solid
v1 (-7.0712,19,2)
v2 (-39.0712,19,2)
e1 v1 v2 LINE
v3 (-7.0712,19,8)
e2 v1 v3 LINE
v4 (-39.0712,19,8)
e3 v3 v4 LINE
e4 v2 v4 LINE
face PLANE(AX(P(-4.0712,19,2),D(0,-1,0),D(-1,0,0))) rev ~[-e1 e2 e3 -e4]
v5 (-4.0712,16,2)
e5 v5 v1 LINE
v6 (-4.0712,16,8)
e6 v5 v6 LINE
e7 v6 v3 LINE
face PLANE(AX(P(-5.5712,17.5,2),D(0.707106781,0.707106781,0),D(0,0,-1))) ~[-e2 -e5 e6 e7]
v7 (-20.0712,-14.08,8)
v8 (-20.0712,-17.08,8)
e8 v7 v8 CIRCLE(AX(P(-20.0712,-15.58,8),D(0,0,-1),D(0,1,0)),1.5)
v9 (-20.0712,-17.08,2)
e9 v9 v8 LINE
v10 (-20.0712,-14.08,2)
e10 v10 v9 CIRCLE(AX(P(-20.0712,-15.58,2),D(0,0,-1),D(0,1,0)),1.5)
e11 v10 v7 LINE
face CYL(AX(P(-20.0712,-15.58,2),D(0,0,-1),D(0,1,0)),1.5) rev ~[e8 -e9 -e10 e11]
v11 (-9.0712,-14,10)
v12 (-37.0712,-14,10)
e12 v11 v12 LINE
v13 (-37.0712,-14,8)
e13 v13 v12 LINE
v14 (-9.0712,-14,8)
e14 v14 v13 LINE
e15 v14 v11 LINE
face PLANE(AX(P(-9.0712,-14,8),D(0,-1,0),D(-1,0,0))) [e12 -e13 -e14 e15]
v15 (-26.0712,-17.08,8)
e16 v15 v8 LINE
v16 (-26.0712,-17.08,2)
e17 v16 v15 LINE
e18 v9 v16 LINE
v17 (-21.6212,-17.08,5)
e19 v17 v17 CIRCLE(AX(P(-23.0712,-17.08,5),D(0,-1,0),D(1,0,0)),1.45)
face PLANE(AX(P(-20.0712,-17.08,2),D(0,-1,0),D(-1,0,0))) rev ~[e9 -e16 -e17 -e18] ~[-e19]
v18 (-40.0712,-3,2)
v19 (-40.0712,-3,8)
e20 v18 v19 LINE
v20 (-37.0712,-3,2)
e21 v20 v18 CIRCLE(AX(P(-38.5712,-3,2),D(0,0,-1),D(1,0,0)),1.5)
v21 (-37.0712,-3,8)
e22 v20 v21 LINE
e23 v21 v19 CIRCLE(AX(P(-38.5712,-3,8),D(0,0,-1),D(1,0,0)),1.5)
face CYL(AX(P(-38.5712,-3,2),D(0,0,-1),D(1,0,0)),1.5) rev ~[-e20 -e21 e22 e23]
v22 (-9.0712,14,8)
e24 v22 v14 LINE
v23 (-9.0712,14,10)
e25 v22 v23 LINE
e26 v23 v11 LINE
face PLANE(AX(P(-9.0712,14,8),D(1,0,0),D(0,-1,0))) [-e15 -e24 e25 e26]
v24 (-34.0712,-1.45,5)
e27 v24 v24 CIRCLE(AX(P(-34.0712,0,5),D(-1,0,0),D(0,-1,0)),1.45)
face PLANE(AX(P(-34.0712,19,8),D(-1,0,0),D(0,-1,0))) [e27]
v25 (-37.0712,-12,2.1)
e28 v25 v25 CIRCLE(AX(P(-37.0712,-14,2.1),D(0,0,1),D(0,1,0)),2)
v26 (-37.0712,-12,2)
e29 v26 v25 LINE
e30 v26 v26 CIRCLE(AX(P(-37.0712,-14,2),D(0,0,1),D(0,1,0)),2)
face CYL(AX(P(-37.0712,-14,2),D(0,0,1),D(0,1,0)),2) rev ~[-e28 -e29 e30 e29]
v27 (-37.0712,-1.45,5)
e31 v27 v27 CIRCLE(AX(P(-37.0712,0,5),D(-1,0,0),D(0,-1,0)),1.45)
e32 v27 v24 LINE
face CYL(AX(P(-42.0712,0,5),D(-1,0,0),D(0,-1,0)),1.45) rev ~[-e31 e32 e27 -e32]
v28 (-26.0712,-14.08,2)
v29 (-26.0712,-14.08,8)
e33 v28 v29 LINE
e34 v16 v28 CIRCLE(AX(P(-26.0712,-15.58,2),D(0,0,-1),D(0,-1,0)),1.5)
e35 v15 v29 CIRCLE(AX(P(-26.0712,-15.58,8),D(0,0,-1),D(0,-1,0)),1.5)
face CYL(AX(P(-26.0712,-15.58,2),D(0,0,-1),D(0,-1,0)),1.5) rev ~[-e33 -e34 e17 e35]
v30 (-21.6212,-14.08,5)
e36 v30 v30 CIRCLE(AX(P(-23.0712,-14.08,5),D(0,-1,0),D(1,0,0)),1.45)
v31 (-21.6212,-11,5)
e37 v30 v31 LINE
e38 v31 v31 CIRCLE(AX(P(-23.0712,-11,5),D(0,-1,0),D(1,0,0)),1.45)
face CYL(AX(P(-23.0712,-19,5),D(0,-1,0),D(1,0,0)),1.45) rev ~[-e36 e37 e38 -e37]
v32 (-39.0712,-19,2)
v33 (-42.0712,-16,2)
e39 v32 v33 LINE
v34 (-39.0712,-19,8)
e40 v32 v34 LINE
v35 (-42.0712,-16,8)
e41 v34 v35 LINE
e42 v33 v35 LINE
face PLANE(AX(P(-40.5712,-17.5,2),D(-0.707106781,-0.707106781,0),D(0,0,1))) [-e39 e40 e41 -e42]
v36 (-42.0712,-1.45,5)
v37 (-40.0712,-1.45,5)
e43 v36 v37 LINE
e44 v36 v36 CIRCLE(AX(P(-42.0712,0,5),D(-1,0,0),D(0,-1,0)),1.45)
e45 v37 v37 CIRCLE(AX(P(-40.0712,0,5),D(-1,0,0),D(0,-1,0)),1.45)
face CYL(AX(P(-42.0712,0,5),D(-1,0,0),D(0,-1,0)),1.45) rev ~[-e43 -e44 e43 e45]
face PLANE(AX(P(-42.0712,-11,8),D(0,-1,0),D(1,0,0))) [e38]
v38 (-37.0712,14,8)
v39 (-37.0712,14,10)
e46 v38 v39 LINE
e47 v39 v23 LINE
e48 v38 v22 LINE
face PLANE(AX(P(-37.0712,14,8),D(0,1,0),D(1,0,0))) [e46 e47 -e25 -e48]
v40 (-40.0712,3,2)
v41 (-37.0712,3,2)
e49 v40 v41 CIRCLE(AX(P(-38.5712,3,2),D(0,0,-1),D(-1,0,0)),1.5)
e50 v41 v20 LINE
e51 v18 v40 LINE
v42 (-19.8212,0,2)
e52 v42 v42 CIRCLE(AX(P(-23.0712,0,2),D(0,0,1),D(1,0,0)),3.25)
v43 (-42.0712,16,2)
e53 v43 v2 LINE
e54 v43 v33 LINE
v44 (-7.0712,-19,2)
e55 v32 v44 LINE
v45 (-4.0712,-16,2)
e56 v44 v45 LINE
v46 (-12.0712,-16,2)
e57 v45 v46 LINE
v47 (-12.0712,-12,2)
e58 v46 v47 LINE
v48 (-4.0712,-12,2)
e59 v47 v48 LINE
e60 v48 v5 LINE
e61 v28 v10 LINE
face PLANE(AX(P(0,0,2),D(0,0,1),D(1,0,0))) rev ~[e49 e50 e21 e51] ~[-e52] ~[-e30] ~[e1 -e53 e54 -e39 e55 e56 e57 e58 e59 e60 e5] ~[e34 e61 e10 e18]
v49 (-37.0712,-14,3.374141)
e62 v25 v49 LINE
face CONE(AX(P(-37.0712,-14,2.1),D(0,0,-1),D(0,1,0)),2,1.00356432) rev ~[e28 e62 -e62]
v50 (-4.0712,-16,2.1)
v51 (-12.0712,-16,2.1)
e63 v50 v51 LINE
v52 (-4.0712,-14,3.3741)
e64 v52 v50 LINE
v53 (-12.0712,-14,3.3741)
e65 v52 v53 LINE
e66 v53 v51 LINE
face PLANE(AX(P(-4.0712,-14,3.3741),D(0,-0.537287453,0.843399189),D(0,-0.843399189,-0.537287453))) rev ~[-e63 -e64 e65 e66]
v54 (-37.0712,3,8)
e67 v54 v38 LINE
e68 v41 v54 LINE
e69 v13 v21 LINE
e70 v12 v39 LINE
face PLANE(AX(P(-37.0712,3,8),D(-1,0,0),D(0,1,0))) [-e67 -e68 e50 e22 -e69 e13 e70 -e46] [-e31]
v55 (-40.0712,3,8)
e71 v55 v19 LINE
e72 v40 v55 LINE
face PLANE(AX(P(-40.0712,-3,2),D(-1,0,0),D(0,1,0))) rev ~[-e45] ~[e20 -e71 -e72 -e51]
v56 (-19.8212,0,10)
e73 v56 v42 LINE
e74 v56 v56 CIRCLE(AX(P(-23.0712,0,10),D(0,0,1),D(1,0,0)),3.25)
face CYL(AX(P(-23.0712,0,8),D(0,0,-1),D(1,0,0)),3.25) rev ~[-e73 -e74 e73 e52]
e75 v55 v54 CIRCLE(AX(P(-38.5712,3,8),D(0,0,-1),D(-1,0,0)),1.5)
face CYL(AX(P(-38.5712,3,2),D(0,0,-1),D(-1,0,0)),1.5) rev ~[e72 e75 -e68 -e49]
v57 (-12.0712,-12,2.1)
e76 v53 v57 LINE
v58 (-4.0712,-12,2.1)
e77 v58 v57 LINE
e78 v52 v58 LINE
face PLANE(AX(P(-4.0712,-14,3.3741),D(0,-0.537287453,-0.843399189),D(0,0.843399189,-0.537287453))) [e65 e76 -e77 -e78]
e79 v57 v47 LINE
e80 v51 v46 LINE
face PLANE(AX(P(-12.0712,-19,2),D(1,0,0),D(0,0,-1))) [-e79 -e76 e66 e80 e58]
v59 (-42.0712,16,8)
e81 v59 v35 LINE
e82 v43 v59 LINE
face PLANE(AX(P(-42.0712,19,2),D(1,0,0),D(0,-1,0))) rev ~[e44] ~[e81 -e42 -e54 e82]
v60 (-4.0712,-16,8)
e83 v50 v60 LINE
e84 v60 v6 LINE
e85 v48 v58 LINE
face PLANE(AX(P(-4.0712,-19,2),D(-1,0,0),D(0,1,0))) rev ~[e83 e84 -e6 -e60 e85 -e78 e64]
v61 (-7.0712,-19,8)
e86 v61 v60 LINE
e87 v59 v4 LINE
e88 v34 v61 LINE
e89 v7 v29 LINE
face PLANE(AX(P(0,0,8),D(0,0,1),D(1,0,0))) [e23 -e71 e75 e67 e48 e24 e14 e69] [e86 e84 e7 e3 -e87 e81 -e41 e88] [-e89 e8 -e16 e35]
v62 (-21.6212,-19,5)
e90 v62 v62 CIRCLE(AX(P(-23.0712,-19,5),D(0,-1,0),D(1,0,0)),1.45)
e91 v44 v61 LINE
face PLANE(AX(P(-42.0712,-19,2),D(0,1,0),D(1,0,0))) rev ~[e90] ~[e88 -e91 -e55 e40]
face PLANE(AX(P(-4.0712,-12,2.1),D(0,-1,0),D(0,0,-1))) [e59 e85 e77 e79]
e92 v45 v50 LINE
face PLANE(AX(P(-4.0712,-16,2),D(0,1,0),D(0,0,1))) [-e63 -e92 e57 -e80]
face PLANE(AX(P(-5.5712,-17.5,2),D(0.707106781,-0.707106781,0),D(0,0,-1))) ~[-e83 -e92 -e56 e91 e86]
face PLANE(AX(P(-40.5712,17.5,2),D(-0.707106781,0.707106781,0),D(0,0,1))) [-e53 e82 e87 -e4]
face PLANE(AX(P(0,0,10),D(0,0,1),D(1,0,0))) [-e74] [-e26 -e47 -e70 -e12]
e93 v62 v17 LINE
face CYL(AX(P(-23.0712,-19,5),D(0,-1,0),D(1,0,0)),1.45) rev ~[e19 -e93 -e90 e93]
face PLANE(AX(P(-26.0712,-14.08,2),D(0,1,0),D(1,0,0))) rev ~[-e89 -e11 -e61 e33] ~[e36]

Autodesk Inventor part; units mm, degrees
ref_plane "YZ Plane" through (0, 0, 0) normal (1, 0, 0) x (0, 1, 0)
ref_plane "XZ Plane" through (0, 0, 0) normal (0, 1, 0) x (-1, 0, 0)
ref_plane "XY Plane" through (0, 0, 0) normal (0, 0, 1) x (1, 0, 0)
ref_plane "Work Plane1" through (0, 0, 2) normal (0, 0, 1) x (1, 0, 0)
sketch "Sketch1" plane through (0, 0, 2) normal (0, 0, 1) x (1, 0, 0)
  circle A0 centre (-37.0712, 14) radius 3.25 construction
  circle A1 centre (-9.0712, -14) radius 3.25 construction
  line L0 (-26.0712, -17.08) -> (-20.0712, -17.08) construction
  arc A2 (-20.0712, -17.08) -> (-20.0712, -14.08) centre (-20.0712, -15.58) ccw construction
  line L1 (-20.0712, -14.08) -> (-26.0712, -14.08) construction
  line L2 (-37.0712, -3) -> (-37.0712, 3) construction
  arc A3 (-37.0712, 3) -> (-40.0712, 3) centre (-38.5712, 3) ccw construction
  line L3 (-40.0712, 3) -> (-40.0712, -3) construction
  line L4 (-47.9712, -17) -> (-47.9712, 17) construction
  line L5 (-47.9712, 17) -> (-44.3964, 17) construction
  line L6 (-44.3964, 17) -> (-40.0712, 21.3252) construction
  line L7 (-40.0712, 21.3252) -> (-40.0712, 24.9) construction
  line L8 (-40.0712, 24.9) -> (-6.0712, 24.9) construction
  line L9 (-6.0712, 24.9) -> (-6.0712, 21.3252) construction
  line L10 (-6.0712, 21.3252) -> (-1.746, 17) construction
  line L11 (-1.746, 17) -> (1.8288, 17) construction
  line L12 (1.8288, 17) -> (1.8288, -17) construction
  line L13 (1.8288, -17) -> (-1.746, -17) construction
  line L14 (-1.746, -17) -> (-6.1126, -21.3666) construction
  line L15 (-6.1126, -21.3666) -> (-6.1126, -24.9) construction
  line L16 (-6.1126, -24.9) -> (-40.0712, -24.9) construction
  circle A4 centre (-37.0712, -14) radius 3.25 construction
  circle A5 centre (-23.0712, 0) radius 12.45 construction
  circle A6 centre (-23.0712, 0) radius 12.7 construction
  line L17 (-37.0712, 14) -> (-9.0712, 14) construction
  line L18 (-9.0712, 14) -> (-9.0712, -14) construction
  line L19 (-9.0712, -14) -> (-37.0712, -14) construction
  line L20 (-37.0712, -14) -> (-37.0712, 14) construction
  line L21 (-4.0712, -19) -> (-4.0712, 19)
  line L22 (-4.0712, 19) -> (-42.0712, 19)
  line L23 (-42.0712, 19) -> (-42.0712, -19)
  line L24 (-42.0712, -19) -> (-4.0712, -19)
  circle A7 centre (-23.0712, 0) radius 12.8
  circle A8 centre (-23.0712, 0) radius 3.25 projected
  line L25 (-40.0712, -24.9) -> (-40.0712, -21.3252) projected
  line L26 (-40.0712, -21.3252) -> (-44.3964, -17) projected
  line L27 (-44.3964, -17) -> (-47.9712, -17) projected
  arc A9 (-26.0712, -14.08) -> (-26.0712, -17.08) centre (-26.0712, -15.58) ccw projected
  arc A10 (-40.0712, -3) -> (-37.0712, -3) centre (-38.5712, -3) ccw projected
  circle A11 centre (-37.0712, -14) radius 3.25 projected
  point P0 (0, 0)
  point P1 (-21.8762, -3.0223)
  point P2 (-25.9925, 1.4242)
  dimension "d0" = 5
  dimension "d1" = 0.1
extrude "Extrusion1" add sketch "Sketch1" along normal blind 6 contours L24 L23 L22 L21 | A7 | A11
sketch "Sketch2" plane through (0, 0, 2) normal (0, 0, -1) x (-1, 0, 0)
  circle A0 centre (23.0712, 0) radius 12.8 projected
  circle A1 centre (23.0712, 0) radius 8.5824
  point P0 (0, 0)
extrude "Extrusion2" add sketch "Sketch2" against normal blind 0.5
sketch "Sketch3" plane through (0, 0, 2) normal (0, 0, -1) x (-1, 0, 0)
  circle A0 centre (9.0712, -14) radius 1.45 construction
  circle A1 centre (9.0712, -14) radius 2.45
  circle A2 centre (37.0712, -14) radius 1.45 projected
  circle A3 centre (37.0712, -14) radius 1.95
  point P0 (0, 0)
  dimension "d8" = 1
  dimension "d10" = 0.5
sketch "Sketch5" plane through (0, 0, 2) normal (0, 0, -1) x (-1, 0, 0)
  arc A0 (20.0712, -14.08) -> (20.0712, -17.08) centre (20.0712, -15.58) ccw projected
  arc A1 (26.0712, -17.08) -> (26.0712, -14.08) centre (26.0712, -15.58) ccw projected
  line L0 (37.0712, 3) -> (37.0712, -3) projected
  arc A2 (37.0712, -3) -> (40.0712, -3) centre (38.5712, -3) ccw projected
  line L1 (40.0712, -3) -> (40.0712, 3) projected
  arc A3 (40.0712, 3) -> (37.0712, 3) centre (38.5712, 3) ccw projected
  line L2 (26.0712, -14.08) -> (20.0712, -14.08) projected
  arc A4 (20.0712, -14.08) -> (20.0712, -17.08) centre (20.0712, -15.58) ccw projected
  line L3 (20.0712, -17.08) -> (26.0712, -17.08) projected
  arc A5 (26.0712, -17.08) -> (26.0712, -14.08) centre (26.0712, -15.58) ccw projected
  circle A6 centre (37.0712, -14) radius 1.45 projected
  circle A7 centre (23.0712, 0) radius 1.45 projected
  circle A8 centre (9.0712, -14) radius 1.45 projected
  circle A9 centre (37.0712, 14) radius 1.45 projected
  line L4 (-1.8288, -17) -> (-1.8288, 17) projected
  line L5 (-1.8288, 17) -> (1.746, 17) projected
  line L6 (1.746, 17) -> (6.0712, 21.3252) projected
  line L7 (6.0712, 21.3252) -> (6.0712, 24.9) projected
  line L8 (6.0712, 24.9) -> (40.0712, 24.9) projected
  line L9 (40.0712, 24.9) -> (40.0712, 21.3252) projected
  line L10 (40.0712, 21.3252) -> (44.3964, 17) projected
  line L11 (44.3964, 17) -> (47.9712, 17) projected
  line L12 (47.9712, 17) -> (47.9712, -17) projected
  line L13 (44.3964, -17) -> (47.9712, -17) projected
  line L14 (40.0712, -21.3252) -> (44.3964, -17) projected
  line L15 (40.0712, -24.9) -> (40.0712, -21.3252) projected
  line L16 (6.1126, -24.9) -> (40.0712, -24.9) projected
  line L17 (6.1126, -24.9) -> (6.1126, -21.3666) projected
  line L18 (6.1126, -21.3666) -> (1.746, -17) projected
  line L19 (1.746, -17) -> (-1.8288, -17) projected
  point P0 (0, 0)
  point P1 (40.0712, -3)
extrude "Extrusion5" cut sketch "Sketch5" against normal blind 8 contours L2 A1 L3 A0 | A3 L1 A2 L0
sketch "Sketch6" plane through (-42.0712, -19, 8) normal (0, -1, 0) x (1, 0, 0)
  line L0 (0, -6) -> (38, -6) projected
  line L1 (38, -6) -> (38, 0) projected
  line L2 (0, 0) -> (38, 0) projected
  line L3 (0, -6) -> (0, 0) projected
  line L4 (31.8, 0) -> (31.8, 0) projected
  circle A0 centre (19, -3) radius 1.45
  point P0 (42.0712, -8)
  point P1 (4.5, 0)
  dimension "d34" = 2.9
extrude "Extrusion6" cut sketch "Sketch6" against normal blind 8 contours A0
pattern_circular "Circular Pattern1" count 2 over 90 about axis through (-23.0712, 0, 2) along (0, 0, -1) of "Extrusion6"
chamfer "Chamfer1" distance 3 angle 45 4 edges at (-42.0712, 19, 5) (-4.0712, 19, 5) (-4.0712, -19, 5) (-42.0712, -19, 5)
hole "Hole1" at (-37.0712, -14, 2) direction (0, 0, 1) diameter 4 depth 0.1 tip angle 115
sketch "Sketch4" plane through (-4.0712, -19, 2) normal (1, 0, 0) x (0, 0, -1)
  line L0 (2, 4.45) -> (6, 4.45)
  line L1 (2, 1.55) -> (6, 1.55)
  line L2 (0, 0) -> (0, 38) projected
  arc A0 (2, 19) -> (2, 19) centre (1.5, 4.4206) ccw projected
  line L3 (-1.3741, 5) -> (-0.1, 7) projected
  line L4 (-1.3741, 5) -> (-0.1, 3) projected
  line L5 (-0.1, 7) -> (0.6045, 7)
  line L6 (0.6045, 7) -> (0.6045, 3)
  line L7 (0.6045, 3) -> (-0.1, 3)
  line L8 (-0.1, 3) -> (-0.1, 7)
extrude "Extrusion4" cut sketch "Sketch4" against normal blind 8 contours L7 L8 L5 L2 | L2 L5 L6 L7 | L4 L3 L8
sketch "Skizze8" plane through (0, 0, 8) normal (0, 0, 1) x (1, 0, 0)
  line L0 (-39.0712, -19) -> (-42.0712, -16) projected
  line L1 (-39.0712, -19) -> (-7.0712, -19) projected
  line L2 (-4.0712, -16) -> (-7.0712, -19) projected
  line L3 (-4.0712, -16) -> (-4.0712, 16) projected
  line L4 (-7.0712, 19) -> (-4.0712, 16) projected
  line L5 (-7.0712, 19) -> (-39.0712, 19) projected
  line L6 (-42.0712, 16) -> (-39.0712, 19) projected
  line L7 (-42.0712, 16) -> (-42.0712, -16) projected
  arc A0 (-37.0712, 3) -> (-40.0712, 3) centre (-38.5712, 3) ccw projected
  line L8 (-37.0712, 3) -> (-37.0712, -3) projected
  arc A1 (-40.0712, -3) -> (-37.0712, -3) centre (-38.5712, -3) ccw projected
  line L9 (-40.0712, -3) -> (-40.0712, 3) projected
  line L10 (-20.0712, -17.08) -> (-26.0712, -17.08) projected
  arc A2 (-26.0712, -14.08) -> (-26.0712, -17.08) centre (-26.0712, -15.58) ccw projected
  line L11 (-26.0712, -14.08) -> (-20.0712, -14.08) projected
  arc A3 (-20.0712, -17.08) -> (-20.0712, -14.08) centre (-20.0712, -15.58) ccw projected
  circle A4 centre (-23.0712, 0) radius 3.25 projected
  line L12 (-9.0712, -14) -> (-37.0712, -14)
  line L13 (-37.0712, -14) -> (-37.0712, 14)
  line L14 (-37.0712, 14) -> (-9.0712, 14)
  line L15 (-9.0712, 14) -> (-9.0712, -14)
  line L16 (-9.0712, -14) -> (-37.0712, 14) construction
  line L17 (-37.0712, -14) -> (-9.0712, 14) construction
  point P0 (0, 0)
extrude "Extrusion8" add sketch "Skizze8" along normal blind 2 contours L13 L14 L15 L12 L8
properties part number "20_Cube_Insert_Kinematic_Beautymirrormount_90_pro_v3"
